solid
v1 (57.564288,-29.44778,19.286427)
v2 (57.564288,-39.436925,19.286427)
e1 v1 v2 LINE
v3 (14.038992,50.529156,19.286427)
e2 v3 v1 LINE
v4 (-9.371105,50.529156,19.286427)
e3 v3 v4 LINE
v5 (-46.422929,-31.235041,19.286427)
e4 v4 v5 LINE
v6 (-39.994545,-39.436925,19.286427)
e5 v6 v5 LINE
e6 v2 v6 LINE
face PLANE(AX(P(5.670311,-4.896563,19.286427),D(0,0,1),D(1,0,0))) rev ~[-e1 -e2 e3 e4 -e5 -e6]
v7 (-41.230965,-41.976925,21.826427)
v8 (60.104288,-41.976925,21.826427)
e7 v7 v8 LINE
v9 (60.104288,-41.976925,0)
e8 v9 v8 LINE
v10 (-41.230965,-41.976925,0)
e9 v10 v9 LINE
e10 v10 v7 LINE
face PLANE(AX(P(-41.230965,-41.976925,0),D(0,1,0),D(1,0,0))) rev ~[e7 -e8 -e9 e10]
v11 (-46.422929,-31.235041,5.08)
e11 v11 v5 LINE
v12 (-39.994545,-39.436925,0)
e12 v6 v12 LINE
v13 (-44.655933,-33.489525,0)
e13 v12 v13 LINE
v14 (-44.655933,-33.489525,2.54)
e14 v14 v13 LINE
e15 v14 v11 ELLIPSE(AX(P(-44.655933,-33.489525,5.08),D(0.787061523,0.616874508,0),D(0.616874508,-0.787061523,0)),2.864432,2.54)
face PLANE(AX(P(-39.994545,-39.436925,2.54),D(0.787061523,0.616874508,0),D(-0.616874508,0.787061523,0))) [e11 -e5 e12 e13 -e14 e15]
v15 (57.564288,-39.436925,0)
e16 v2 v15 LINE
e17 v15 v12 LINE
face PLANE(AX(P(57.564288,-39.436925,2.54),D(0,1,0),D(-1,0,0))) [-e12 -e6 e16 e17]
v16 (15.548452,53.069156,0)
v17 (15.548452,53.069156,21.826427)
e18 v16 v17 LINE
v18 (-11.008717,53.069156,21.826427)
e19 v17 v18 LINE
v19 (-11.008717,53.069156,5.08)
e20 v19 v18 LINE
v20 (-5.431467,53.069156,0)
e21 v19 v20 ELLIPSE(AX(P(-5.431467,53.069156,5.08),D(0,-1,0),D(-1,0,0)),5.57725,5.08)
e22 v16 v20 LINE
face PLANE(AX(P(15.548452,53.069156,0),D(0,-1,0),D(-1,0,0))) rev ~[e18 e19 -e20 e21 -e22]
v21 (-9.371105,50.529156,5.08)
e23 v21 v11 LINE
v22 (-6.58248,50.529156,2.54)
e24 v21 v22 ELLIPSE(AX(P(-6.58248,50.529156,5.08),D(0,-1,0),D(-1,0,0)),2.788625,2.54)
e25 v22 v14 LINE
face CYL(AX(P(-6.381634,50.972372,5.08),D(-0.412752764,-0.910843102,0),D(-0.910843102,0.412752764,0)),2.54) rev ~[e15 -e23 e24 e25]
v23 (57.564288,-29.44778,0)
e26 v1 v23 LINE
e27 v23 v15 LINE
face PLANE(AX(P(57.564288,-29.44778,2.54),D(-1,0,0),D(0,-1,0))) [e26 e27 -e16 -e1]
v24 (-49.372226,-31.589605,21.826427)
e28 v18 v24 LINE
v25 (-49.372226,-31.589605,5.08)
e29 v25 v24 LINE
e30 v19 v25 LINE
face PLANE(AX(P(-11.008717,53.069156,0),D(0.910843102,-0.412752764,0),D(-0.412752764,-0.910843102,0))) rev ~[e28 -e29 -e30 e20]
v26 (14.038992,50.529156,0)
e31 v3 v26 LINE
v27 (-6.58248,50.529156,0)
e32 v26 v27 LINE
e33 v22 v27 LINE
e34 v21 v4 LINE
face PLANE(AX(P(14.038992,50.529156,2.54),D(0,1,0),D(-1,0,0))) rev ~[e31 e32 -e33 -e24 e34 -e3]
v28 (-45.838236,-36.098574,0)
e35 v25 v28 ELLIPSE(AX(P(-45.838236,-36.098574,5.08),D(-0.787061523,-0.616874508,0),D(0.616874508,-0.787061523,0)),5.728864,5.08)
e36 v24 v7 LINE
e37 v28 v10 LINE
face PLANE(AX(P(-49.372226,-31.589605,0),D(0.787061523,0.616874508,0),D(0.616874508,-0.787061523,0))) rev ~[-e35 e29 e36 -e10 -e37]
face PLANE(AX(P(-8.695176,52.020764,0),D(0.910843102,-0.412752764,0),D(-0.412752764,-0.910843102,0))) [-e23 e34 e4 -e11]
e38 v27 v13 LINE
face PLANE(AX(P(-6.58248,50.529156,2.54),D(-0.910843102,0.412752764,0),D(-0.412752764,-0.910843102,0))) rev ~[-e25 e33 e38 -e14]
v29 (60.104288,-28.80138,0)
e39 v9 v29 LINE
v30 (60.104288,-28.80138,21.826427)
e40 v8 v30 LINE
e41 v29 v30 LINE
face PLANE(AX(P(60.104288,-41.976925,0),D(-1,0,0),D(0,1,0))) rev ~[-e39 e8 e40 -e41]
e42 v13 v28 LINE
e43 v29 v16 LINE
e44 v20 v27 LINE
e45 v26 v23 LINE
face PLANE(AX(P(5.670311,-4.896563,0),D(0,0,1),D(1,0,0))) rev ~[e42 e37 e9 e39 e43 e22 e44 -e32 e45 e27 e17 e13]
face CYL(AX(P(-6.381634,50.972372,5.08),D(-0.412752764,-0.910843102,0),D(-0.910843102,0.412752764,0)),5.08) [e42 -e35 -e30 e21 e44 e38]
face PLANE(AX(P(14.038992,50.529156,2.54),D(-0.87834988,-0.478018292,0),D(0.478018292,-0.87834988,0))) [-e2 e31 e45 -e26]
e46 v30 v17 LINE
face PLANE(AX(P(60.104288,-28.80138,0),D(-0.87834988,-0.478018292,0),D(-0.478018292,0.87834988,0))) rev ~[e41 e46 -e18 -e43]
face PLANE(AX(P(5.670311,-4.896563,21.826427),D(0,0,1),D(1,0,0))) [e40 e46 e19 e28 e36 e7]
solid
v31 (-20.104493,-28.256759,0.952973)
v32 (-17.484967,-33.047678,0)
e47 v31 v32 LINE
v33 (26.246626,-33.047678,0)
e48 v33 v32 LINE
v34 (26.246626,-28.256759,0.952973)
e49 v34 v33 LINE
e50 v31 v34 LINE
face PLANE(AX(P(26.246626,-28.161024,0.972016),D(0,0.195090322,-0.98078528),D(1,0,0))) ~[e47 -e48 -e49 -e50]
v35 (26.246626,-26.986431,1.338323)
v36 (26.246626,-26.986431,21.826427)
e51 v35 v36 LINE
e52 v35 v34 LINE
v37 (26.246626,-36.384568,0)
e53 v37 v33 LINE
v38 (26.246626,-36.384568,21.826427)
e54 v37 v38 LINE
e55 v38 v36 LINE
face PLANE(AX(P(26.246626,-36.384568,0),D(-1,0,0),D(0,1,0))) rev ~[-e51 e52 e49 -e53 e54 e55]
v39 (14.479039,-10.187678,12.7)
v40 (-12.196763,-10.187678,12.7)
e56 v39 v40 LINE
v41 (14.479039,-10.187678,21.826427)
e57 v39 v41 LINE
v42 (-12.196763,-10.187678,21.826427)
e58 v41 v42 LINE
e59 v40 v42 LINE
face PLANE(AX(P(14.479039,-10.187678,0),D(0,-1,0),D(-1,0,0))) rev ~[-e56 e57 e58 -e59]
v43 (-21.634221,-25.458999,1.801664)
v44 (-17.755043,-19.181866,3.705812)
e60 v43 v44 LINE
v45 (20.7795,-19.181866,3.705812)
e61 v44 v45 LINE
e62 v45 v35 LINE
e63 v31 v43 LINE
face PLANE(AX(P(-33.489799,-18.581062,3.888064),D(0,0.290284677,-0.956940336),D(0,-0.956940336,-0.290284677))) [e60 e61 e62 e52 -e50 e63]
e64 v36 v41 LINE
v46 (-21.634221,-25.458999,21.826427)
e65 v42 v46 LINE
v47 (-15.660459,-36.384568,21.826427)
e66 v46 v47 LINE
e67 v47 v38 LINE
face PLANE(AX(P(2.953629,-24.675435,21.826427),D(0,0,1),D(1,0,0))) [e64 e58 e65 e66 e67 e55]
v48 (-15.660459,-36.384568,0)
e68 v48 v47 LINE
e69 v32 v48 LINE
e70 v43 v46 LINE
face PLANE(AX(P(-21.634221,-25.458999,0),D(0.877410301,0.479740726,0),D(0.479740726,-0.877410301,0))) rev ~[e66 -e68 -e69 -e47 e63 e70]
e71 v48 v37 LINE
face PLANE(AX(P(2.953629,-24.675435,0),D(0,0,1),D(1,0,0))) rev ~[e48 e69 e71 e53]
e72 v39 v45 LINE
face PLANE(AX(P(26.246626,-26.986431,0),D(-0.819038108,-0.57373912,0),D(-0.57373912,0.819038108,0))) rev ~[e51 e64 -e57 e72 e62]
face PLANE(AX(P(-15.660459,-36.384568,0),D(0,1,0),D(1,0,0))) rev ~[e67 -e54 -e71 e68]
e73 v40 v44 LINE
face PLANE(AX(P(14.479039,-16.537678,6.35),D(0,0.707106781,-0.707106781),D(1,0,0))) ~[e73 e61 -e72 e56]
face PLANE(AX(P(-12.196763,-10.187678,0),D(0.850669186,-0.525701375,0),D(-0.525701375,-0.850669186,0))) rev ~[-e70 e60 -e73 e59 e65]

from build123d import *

# Parameters (mm, degrees)
F2_DEPTH    = 21.8264274299
F3_R        = 5.08
F4_T        = -2.54
F5_SIZE     = 12.7
F6_SIZE     = 5.08
F7_SIZE     = 5.08
F8_T1_DEPTH = 70.3417608066


# Not quite as in the source:
# - a fillet or chamfer that OpenCascade refuses, or shapes differently, is made with other operations: its cross-section is extruded or revolved along the edge and cut away or added
# - a shell that OpenCascade refuses in one call is made with other operations: the cavity is built on its own and cut out


with BuildPart() as f2:
    # F1 (on Top) → F2 (new body)
    with BuildSketch(Plane.XY):
        Polygon((-21.634221077, -25.4589989781), (-15.6604591757, -36.3845676184), (26.2466259301, -36.3845676184), (26.2466259301, -26.9864313304), (14.4790392369, -10.1876780391), (-12.1967634186, -10.1876780391), align=None)
    extrude(amount=F2_DEPTH)

    # F5
    f5_edges = [f2.edges().sort_by_distance(p)[0] for p in [
        (1.141138, -10.187678, 0),
    ]]
    chamfer(f5_edges, length=F5_SIZE)

    # F6
    f6_edges = [f2.edges().sort_by_distance(p)[0] for p in [
        (1.665127, -22.887678, 0),
    ]]
    chamfer(f6_edges, length=F6_SIZE)

    # F7
    f7_edges = [f2.edges().sort_by_distance(p)[0] for p in [
        (2.992036, -27.967678, 0),
    ]]
    chamfer(f7_edges, length=F7_SIZE)

    # F8: chamfer of 5.08 on 1 edges, made by hand

    # F8_s2 → F8_t1 (cut)
    with BuildSketch(Plane.YZ.offset(-33.4897993752)):
        Polygon((-18.5810619888, 3.8880636728), (-28.2567592384, 0.9529730006), (-23.2743700139, 1.9440318364), align=None)
    extrude(amount=F8_T1_DEPTH, mode=Mode.SUBTRACT)


with BuildPart() as f2b:
    # F0 (on Top) → F2, piece 2 (new body)
    with BuildSketch(Plane.XY):
        Polygon((15.5484518036, 53.0691556633), (-11.0087171197, 53.0691556633), (-49.3722259998, -31.5896049142), (-41.2309654057, -41.9769249856), (60.1042881608, -41.9769249856), (60.1042881608, -28.8013797253), align=None)
    extrude(amount=F2_DEPTH)

    # F3
    f3_edges = [f2b.edges().sort_by_distance(p)[0] for p in [
        (-30.190472, 10.739775, 0),
    ]]
    fillet(f3_edges, radius=F3_R)

    # F4: a shell. OpenCascade refuses it in one call, so the cavity is built on its own and cut out:
    # the body offset inwards by the wall thickness, plus a prism from it out through each open face.
    f4_core = offset(f2b.part, amount=F4_T, kind=Kind.INTERSECTION, mode=Mode.PRIVATE)
    f4_exits = [f4_core.faces().sort_by_distance(p)[0] for p in [
        (6.185491, -4.45819, 2.54),
    ]]
    add(f4_core, mode=Mode.SUBTRACT)
    extrude(f4_exits, amount=-F4_T, mode=Mode.SUBTRACT)


solid = Compound([f2.part, f2b.part])
